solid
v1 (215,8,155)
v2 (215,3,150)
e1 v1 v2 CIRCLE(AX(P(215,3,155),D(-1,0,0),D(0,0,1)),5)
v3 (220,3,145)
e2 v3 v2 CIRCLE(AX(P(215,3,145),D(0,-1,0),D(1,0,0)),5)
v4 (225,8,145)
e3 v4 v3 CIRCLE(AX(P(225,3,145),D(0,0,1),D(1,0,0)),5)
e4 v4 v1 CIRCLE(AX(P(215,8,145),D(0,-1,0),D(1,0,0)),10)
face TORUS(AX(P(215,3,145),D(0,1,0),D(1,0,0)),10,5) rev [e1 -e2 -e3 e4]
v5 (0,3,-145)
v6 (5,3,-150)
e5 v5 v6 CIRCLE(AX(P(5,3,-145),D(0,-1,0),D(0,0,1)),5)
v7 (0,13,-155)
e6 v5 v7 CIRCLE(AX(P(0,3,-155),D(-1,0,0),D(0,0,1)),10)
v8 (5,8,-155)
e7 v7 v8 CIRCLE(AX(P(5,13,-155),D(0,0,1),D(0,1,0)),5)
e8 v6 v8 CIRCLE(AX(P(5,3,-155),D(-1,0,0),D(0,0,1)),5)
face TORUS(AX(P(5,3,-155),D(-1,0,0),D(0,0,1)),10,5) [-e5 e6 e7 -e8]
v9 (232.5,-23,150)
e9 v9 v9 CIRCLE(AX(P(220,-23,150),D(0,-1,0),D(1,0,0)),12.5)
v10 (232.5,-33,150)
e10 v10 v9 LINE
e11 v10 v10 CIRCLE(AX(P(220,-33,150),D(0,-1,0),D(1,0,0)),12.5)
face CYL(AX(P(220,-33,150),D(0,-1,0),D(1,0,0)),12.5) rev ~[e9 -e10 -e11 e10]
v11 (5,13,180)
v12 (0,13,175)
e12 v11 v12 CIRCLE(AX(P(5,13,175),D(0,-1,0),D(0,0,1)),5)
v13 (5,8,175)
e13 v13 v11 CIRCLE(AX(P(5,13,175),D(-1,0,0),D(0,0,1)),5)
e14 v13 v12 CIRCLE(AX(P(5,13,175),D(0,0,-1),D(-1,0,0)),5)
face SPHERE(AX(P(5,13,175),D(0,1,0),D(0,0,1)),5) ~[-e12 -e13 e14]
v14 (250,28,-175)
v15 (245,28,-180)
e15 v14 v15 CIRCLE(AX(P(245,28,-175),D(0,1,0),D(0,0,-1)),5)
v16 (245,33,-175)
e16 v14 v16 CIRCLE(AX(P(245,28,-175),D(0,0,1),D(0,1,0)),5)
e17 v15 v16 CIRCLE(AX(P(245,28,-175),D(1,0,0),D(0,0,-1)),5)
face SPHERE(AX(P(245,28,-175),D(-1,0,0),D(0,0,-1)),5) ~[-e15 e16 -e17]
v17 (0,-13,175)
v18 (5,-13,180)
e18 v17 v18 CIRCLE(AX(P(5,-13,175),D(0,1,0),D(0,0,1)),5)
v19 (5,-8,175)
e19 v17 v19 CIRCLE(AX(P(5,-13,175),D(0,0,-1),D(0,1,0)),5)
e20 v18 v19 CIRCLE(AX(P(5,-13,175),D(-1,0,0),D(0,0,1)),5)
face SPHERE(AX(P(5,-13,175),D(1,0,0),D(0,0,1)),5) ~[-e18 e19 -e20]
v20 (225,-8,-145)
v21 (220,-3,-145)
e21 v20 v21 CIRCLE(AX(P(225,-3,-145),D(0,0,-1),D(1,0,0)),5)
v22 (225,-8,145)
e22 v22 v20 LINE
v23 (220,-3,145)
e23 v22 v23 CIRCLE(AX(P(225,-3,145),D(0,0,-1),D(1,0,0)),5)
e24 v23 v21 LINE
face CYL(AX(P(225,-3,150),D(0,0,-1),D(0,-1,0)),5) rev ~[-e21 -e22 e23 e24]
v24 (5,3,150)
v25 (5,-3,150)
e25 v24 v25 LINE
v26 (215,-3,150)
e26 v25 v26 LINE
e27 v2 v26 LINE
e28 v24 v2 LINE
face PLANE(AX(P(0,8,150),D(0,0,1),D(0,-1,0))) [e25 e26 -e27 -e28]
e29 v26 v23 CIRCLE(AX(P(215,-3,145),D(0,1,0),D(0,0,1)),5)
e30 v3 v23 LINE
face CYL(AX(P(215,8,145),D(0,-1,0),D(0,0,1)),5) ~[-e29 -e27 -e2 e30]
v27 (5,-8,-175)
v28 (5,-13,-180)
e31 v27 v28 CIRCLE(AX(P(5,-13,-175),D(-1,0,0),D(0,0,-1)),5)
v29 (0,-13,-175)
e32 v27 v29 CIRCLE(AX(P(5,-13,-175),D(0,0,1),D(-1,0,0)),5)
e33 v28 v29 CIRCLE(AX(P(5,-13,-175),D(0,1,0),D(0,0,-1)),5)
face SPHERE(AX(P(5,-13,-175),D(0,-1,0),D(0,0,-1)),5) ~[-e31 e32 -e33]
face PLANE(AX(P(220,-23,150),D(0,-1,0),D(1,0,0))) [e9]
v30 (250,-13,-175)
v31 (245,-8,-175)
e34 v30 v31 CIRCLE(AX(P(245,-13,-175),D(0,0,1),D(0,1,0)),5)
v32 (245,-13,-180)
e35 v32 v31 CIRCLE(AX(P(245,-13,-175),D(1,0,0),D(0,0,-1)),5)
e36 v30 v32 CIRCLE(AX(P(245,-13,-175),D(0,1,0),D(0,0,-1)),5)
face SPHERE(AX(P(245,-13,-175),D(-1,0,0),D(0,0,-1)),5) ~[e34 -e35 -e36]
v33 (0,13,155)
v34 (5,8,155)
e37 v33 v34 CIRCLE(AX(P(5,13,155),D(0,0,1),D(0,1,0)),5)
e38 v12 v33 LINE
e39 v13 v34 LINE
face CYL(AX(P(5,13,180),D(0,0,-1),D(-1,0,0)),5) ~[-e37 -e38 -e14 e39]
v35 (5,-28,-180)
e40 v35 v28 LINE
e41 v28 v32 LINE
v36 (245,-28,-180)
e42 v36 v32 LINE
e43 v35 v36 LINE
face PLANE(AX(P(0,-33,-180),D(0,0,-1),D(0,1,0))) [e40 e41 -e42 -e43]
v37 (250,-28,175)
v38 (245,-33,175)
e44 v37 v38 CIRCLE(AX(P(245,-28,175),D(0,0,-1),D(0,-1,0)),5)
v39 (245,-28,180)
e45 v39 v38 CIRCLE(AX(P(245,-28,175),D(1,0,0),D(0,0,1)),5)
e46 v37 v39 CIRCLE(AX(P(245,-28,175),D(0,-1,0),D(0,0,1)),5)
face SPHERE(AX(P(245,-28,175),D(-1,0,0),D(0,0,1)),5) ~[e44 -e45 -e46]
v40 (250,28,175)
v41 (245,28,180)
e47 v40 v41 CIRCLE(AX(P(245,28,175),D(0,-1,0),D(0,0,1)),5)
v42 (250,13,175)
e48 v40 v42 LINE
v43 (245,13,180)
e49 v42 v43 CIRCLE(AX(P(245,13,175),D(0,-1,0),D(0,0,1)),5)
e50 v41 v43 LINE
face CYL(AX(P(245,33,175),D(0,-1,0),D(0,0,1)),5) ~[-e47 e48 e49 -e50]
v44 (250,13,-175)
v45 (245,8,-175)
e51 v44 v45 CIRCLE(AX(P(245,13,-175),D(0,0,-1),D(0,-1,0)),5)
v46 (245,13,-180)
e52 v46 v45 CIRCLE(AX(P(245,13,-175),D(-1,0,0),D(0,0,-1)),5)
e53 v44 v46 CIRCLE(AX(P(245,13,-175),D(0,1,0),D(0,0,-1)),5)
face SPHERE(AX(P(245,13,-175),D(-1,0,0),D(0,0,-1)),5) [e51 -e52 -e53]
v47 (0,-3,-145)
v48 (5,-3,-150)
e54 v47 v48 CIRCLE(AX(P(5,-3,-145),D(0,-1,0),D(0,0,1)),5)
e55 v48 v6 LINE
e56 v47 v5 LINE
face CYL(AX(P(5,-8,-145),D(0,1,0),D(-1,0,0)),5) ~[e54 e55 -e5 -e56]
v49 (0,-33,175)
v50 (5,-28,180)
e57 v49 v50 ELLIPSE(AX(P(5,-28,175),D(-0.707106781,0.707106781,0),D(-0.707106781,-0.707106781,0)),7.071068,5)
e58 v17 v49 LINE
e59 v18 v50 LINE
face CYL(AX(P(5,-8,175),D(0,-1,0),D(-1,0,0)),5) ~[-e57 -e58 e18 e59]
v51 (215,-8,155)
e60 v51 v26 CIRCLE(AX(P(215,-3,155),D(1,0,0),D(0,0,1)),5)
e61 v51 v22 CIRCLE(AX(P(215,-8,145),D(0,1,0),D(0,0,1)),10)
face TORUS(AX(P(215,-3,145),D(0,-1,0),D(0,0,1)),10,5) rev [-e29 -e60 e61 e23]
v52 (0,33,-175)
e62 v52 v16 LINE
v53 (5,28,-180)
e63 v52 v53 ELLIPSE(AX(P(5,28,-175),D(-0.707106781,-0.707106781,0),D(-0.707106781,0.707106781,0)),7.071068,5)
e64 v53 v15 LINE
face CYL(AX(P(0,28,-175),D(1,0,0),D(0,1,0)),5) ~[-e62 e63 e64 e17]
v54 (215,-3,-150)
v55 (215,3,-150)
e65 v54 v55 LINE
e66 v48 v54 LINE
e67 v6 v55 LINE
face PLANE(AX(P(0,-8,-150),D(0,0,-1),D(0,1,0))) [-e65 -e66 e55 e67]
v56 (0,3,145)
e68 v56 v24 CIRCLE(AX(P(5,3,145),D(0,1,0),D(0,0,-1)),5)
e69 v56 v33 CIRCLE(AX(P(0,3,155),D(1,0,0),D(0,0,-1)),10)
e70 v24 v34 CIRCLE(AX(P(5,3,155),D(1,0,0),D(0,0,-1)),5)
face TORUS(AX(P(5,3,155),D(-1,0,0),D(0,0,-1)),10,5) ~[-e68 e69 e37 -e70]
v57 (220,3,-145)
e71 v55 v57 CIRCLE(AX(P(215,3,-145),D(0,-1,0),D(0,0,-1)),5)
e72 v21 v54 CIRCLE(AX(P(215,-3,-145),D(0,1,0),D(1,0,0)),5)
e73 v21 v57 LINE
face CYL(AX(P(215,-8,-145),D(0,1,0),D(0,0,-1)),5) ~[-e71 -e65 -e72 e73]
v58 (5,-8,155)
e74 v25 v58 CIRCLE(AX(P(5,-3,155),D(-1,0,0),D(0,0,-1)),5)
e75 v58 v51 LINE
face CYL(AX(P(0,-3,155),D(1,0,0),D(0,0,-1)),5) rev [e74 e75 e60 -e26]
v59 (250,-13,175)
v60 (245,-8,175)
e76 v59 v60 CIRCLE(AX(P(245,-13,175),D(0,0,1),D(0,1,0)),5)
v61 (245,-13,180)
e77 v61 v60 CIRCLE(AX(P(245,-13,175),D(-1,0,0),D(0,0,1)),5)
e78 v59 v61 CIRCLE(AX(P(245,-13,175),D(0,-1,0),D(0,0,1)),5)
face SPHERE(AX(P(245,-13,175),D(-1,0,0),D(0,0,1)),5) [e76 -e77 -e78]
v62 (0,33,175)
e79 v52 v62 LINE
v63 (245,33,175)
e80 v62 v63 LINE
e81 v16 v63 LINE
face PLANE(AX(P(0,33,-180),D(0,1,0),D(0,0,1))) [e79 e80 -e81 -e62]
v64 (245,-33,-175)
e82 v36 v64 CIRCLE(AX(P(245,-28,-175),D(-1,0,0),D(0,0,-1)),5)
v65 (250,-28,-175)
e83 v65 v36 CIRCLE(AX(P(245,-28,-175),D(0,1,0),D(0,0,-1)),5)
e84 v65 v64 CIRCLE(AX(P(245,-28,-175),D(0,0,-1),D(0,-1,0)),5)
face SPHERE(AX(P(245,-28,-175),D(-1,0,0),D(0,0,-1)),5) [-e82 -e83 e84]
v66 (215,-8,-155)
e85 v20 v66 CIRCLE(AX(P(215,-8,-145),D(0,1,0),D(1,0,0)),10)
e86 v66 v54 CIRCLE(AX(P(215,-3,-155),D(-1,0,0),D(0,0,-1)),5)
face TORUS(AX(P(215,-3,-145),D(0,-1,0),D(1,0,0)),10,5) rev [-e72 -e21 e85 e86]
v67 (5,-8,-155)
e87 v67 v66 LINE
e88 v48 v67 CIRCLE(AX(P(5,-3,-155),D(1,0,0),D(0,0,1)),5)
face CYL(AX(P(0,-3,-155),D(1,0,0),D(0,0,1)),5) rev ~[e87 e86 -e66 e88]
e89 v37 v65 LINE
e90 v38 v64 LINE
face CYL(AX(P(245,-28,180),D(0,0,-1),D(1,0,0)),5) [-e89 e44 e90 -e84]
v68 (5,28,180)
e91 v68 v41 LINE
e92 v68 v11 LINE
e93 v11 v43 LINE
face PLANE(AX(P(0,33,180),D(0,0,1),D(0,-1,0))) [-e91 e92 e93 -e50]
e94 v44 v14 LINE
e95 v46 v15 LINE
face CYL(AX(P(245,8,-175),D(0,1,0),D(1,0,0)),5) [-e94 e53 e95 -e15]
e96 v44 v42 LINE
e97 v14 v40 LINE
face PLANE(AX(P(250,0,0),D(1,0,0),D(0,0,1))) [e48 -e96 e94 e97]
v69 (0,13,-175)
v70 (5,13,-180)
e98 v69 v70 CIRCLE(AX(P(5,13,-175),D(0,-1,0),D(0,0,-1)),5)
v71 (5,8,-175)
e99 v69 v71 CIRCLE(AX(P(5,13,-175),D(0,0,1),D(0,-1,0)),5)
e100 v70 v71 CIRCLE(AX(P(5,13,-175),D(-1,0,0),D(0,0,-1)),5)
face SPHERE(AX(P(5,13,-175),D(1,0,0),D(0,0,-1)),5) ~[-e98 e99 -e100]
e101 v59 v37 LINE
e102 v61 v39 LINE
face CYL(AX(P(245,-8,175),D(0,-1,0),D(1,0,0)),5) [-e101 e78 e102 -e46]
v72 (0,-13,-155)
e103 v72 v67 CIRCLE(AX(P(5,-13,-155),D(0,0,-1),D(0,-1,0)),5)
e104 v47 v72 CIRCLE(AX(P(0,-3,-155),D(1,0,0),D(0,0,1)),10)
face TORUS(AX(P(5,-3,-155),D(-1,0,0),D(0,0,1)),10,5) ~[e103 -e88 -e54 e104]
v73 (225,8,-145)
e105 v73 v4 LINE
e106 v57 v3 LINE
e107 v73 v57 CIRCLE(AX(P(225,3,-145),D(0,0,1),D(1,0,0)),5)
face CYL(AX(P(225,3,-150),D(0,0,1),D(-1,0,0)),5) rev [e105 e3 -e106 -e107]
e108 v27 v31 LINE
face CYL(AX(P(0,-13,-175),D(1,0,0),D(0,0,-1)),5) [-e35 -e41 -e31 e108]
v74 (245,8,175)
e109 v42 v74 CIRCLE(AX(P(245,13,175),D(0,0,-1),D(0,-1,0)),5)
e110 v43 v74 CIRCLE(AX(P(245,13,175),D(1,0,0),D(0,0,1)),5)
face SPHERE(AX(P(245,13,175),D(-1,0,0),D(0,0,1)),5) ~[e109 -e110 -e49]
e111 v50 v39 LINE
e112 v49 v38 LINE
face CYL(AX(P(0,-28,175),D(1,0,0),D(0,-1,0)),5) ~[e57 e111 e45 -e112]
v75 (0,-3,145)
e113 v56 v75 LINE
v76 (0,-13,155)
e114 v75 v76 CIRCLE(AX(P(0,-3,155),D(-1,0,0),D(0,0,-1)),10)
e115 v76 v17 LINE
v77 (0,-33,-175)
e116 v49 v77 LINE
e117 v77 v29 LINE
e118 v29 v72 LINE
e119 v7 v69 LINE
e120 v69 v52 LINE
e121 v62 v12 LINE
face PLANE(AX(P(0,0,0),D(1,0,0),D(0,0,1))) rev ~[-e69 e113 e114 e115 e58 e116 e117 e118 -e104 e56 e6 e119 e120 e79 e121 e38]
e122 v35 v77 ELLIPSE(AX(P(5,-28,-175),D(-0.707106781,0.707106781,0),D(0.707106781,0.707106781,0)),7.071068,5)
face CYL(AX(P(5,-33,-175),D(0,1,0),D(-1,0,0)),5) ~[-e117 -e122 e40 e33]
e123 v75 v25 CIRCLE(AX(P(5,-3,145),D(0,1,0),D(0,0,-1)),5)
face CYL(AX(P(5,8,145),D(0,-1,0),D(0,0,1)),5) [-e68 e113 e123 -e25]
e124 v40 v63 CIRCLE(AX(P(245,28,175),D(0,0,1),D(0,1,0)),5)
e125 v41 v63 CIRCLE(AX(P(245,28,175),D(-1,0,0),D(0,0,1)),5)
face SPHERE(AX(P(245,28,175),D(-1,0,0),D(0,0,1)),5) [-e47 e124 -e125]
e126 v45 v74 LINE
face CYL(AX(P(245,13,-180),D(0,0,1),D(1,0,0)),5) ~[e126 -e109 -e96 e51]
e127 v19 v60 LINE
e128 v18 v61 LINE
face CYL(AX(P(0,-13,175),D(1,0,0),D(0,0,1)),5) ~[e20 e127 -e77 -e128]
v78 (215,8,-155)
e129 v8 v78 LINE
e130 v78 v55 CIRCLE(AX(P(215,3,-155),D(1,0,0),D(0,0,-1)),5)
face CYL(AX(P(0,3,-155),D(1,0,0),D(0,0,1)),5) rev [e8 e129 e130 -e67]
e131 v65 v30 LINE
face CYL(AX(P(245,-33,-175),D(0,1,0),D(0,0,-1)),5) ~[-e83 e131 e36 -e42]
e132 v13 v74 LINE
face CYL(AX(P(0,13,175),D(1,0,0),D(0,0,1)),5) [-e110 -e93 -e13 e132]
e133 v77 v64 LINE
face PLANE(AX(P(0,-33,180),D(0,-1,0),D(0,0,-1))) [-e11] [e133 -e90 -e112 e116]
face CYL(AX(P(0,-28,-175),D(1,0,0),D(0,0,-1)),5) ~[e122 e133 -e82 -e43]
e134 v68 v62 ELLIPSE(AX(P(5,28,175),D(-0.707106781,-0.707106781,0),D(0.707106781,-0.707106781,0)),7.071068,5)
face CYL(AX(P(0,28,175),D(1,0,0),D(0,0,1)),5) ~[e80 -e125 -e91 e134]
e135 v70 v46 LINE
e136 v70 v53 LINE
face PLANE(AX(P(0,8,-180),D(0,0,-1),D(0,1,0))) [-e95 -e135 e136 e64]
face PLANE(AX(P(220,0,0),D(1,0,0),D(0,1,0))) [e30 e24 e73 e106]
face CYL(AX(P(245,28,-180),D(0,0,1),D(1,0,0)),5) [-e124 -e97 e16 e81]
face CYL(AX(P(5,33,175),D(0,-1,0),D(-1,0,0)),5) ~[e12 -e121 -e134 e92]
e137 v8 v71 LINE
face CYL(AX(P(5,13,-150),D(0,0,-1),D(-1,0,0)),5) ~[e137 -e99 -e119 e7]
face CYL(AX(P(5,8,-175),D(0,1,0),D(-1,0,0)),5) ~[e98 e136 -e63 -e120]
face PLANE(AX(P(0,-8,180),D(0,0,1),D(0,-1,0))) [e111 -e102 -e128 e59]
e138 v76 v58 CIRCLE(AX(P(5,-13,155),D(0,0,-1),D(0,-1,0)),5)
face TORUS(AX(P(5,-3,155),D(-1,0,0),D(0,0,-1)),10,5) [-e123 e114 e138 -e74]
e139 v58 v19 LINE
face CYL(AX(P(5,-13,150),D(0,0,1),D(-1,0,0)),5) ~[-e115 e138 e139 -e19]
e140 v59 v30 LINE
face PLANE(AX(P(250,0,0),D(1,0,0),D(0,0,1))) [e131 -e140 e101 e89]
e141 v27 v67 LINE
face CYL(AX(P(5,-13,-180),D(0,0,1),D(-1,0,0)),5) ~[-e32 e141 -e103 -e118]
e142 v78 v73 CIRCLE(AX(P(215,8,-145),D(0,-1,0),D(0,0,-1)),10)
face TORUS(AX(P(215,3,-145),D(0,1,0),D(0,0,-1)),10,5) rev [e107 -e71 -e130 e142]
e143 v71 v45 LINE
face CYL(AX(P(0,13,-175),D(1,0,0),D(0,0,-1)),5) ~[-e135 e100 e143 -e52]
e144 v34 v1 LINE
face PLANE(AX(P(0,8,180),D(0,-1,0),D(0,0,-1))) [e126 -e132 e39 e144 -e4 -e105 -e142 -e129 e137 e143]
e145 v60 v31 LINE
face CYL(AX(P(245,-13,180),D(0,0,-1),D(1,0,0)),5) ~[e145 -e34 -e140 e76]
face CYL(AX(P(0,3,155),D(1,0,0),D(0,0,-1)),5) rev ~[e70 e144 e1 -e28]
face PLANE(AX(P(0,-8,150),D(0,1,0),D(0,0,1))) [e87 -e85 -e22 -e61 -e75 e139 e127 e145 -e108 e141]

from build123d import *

# Parameters (mm, degrees)
F3_R     = 12.5
F4_DEPTH = 10
F6_DEPTH = 30
F7_R     = 5


with BuildPart() as f2:
    # F2: sweep along a path in F1
    with BuildLine(Plane.XZ) as f2_path:
        Line((0, 0), (250, 0))
    # F0 (on Right) → F2 (sweep)
    with BuildSketch(Plane.YZ):
        Polygon((8, 150), (0, 150), (-8, 150), (-8, 180), (-33, 180), (-33, -180), (-8, -180), (-8, -150), (0, -150), (8, -150), (8, -180), (33, -180), (33, 180), (8, 180), align=None)
    sweep(path=f2_path.line)

    # F3 (on face) → F4 (cut)
    with BuildSketch(Plane.XZ.offset(33)):
        with Locations((220, 150)):
            Circle(F3_R)
    extrude(amount=-F4_DEPTH, mode=Mode.SUBTRACT)

    # F5 (on face) → F6 (cut)
    with BuildSketch(Plane.YZ.offset(250)):
        Polygon((8, 150), (0, 150), (-8, 150), (-8, -150), (0, -150), (8, -150), align=None)
    extrude(amount=-F6_DEPTH, mode=Mode.SUBTRACT)

    # F7
    f7_edges = [f2.edges().sort_by_distance(p)[0] for p in [
        (110, 8, 150),
        (220, 0, 150),
        (110, -8, 150),
        (0, 0, 150),
        (110, -8, -150),
        (220, 0, -150),
        (110, 8, -150),
        (0, 0, -150),
        (125, 33, 180),
        (0, 20.5, 180),
        (125, 8, 180),
        (250, 20.5, 180),
        (125, -8, 180),
        (0, -20.5, 180),
        (125, -33, 180),
        (250, -20.5, 180),
        (125, 8, -180),
        (0, 20.5, -180),
        (125, 33, -180),
        (250, 20.5, -180),
        (125, -33, -180),
        (0, -20.5, -180),
        (125, -8, -180),
        (250, -20.5, -180),
        (0, -8, 165),
        (0, -8, -165),
        (0, 8, -165),
        (0, 8, 165),
        (250, 8, 0),
        (250, 33, 0),
        (250, -8, 0),
        (250, -33, 0),
        (220, -8, 0),
        (220, 8, 0),
    ]]
    fillet(f7_edges, radius=F7_R)


solid = f2.part
